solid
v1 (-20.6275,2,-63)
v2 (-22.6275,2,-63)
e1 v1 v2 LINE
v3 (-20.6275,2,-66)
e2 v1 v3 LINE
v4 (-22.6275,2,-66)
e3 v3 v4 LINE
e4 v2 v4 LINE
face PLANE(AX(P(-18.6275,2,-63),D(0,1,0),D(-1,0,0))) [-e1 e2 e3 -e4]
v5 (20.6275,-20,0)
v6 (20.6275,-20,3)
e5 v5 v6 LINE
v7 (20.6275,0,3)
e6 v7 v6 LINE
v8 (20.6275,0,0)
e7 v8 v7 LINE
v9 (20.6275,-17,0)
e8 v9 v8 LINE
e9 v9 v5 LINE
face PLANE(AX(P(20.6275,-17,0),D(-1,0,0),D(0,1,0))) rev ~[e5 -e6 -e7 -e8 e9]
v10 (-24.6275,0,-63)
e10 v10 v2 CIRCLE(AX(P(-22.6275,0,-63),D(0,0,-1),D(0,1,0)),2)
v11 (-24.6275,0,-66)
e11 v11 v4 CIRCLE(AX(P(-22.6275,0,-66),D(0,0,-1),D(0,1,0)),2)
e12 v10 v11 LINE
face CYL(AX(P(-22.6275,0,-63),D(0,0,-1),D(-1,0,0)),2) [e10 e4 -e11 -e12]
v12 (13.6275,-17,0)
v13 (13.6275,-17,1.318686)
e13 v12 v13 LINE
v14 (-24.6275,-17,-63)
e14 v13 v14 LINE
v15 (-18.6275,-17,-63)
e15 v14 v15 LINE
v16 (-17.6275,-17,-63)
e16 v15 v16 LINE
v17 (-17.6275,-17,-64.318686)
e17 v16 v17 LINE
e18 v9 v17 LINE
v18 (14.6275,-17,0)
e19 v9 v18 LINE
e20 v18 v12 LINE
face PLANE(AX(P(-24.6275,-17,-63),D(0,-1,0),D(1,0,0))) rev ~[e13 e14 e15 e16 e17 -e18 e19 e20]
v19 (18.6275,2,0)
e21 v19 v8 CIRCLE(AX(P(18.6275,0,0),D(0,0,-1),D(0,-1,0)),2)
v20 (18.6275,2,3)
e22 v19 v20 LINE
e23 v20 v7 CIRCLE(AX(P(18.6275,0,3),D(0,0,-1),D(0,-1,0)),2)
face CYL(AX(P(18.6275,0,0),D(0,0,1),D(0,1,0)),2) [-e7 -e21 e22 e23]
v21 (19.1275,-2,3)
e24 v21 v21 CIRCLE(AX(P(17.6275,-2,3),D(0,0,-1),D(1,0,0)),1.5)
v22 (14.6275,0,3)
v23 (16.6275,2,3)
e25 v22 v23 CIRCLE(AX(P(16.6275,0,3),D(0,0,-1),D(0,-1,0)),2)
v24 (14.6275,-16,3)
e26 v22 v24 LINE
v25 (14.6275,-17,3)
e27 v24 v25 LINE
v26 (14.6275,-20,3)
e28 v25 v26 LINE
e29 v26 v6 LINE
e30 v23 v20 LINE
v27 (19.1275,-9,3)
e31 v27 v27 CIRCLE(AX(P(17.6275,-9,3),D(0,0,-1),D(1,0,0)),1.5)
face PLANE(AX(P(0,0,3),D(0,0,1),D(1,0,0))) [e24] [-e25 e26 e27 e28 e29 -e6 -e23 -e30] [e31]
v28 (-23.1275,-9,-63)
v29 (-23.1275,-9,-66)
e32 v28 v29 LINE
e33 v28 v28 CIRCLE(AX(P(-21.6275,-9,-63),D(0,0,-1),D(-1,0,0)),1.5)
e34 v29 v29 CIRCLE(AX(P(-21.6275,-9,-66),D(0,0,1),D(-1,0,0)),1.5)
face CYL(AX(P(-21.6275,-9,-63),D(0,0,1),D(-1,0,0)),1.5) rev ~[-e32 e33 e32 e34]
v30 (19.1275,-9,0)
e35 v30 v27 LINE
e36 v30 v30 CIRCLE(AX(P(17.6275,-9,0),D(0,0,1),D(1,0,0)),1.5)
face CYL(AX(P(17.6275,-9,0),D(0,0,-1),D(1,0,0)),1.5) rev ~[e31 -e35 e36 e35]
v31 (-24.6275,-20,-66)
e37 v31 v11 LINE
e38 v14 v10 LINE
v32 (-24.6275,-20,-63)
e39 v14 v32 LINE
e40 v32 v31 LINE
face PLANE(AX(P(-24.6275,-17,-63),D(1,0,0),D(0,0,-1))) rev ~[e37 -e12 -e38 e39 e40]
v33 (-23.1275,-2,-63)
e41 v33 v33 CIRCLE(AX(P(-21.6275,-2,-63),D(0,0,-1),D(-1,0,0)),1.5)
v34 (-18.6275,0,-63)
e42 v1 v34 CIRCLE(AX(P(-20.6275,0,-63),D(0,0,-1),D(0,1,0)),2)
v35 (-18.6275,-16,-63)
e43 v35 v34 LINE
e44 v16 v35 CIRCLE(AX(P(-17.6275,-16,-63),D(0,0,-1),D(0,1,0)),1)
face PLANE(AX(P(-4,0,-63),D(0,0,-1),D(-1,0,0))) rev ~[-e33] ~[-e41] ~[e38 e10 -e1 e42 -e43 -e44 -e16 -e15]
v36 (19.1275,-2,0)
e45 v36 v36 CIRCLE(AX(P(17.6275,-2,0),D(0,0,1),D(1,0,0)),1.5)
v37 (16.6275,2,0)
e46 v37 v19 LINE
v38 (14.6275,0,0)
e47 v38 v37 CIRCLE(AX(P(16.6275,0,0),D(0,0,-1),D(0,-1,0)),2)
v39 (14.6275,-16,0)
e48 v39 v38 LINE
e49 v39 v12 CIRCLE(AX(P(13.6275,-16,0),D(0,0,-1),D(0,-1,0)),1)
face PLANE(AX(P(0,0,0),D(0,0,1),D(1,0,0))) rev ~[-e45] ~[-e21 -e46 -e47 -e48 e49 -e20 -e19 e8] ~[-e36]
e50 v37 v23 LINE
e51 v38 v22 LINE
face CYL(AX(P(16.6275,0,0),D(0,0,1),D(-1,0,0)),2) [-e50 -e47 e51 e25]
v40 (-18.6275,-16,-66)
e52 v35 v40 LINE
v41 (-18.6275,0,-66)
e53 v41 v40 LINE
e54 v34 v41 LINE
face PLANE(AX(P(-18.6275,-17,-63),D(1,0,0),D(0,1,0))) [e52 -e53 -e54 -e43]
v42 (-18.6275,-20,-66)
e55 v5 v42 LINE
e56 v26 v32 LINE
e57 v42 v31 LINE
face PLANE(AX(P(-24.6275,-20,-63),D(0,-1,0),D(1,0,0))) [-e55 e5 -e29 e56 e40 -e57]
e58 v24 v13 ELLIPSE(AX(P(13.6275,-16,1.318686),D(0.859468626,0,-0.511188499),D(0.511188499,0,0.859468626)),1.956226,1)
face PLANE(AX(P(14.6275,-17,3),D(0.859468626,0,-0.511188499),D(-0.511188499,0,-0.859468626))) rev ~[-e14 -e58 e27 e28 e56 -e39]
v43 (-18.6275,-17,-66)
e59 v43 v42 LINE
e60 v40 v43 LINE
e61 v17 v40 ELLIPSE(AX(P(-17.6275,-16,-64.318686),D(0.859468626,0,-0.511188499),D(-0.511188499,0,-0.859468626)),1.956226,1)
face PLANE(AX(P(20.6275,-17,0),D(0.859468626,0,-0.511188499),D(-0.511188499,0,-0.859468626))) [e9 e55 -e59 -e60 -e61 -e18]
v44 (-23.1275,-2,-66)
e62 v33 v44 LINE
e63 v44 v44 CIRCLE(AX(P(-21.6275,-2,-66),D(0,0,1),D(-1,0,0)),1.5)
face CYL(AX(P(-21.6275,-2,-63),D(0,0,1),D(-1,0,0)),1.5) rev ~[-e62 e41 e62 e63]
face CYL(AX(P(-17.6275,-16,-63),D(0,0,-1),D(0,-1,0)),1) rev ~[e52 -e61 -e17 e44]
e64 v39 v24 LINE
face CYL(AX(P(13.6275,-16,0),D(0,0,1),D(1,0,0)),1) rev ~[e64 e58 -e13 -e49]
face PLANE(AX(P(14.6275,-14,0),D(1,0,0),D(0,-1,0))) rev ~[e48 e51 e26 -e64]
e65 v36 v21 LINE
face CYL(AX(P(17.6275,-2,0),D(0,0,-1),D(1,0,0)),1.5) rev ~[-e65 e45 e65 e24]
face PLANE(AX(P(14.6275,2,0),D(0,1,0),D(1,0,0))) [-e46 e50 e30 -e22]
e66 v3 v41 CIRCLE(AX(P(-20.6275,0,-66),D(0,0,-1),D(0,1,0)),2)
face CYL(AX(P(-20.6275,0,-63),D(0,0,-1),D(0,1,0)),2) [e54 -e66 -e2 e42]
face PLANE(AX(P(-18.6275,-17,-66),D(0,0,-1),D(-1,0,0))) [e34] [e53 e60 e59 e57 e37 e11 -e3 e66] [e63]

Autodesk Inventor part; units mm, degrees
ref_plane "YZ Plane" through (0, 0, 0) normal (1, 0, 0) x (0, 1, 0)
ref_plane "XZ Plane" through (0, 0, 0) normal (0, 1, 0) x (-1, 0, 0)
ref_plane "XY Plane" through (0, 0, 0) normal (0, 0, 1) x (1, 0, 0)
sketch "Sketch1" plane through (0, 0, 0) normal (0, 0, 1) x (1, 0, 0)
  line L0 (32.6242, -2.1) -> (40.6242, -2.1) projected
  arc A0 (41.6242, -3.1) -> (40.6242, -2.1) centre (40.6242, -3.1) ccw projected
  line L1 (41.6242, -3.1) -> (41.6242, -14) projected
  line L2 (65.6275, -14) -> (41.6242, -14) projected
  line L3 (65.6275, -14) -> (65.6275, -2) projected
  arc A1 (67.6275, 0) -> (65.6275, -2) centre (67.6275, -2) ccw projected
  line L4 (67.6275, 0) -> (74, 0) projected
  line L5 (74, 0) -> (74, 2) projected
  line L6 (10, 2) -> (74, 2) projected
  line L7 (10, 2) -> (10, -14) projected
  line L8 (31.6242, -14) -> (10, -14) projected
  line L9 (31.6242, -14) -> (31.6242, -3.1) projected
  arc A2 (32.6242, -2.1) -> (31.6242, -3.1) centre (32.6242, -3.1) ccw projected
  circle A3 centre (12.5, -10.5) radius 1 projected
  circle A4 centre (59.6275, -9) radius 1.5 projected
  circle A5 centre (27.6275, -9) radius 1.5 projected
  circle A6 centre (17.6275, -2) radius 1.5 projected
  circle A7 centre (47.6275, -2) radius 1.5 projected
  circle A8 centre (59.6275, -2) radius 1.5 projected
  circle A9 centre (27.6275, -2) radius 1.5 projected
  circle A10 centre (17.6275, -9) radius 1.5 projected
  circle A11 centre (47.6275, -9) radius 1.5 projected
  line L10 (17.6275, -9) -> (17.6275, -2)
  line L11 (64.6275, -17) -> (10, -17) projected
  line L12 (20.6275, -13) -> (14.6275, -13)
  line L13 (14.6275, -13) -> (14.6275, 2)
  line L14 (14.6275, 2) -> (20.6275, 2)
  line L15 (20.6275, 2) -> (20.6275, -13)
  line L16 (20.6275, -13) -> (14.6275, 2) construction
  line L17 (14.6275, -13) -> (20.6275, 2) construction
  line L18 (20.6275, -13) -> (14.6275, -13)
  line L19 (14.6275, -13) -> (14.6275, -17)
  line L20 (14.6275, -17) -> (20.6275, -17)
  line L21 (20.6275, -17) -> (20.6275, -13)
  point P0 (0, 0)
  point P1 (17.6275, -5.5)
  dimension "d0" = 6
  dimension "d1" = 15
  dimension "d2" = 6
  dimension "d3" = 4
extrude "Extrusion1" add sketch "Sketch1" along normal blind 3 contours L21 L11 L19 L8 | L8 L19 L12 L21 | L12 L13 L6 L15
ref_plane "Work Plane1" through (-4, 0, -63) normal (0, 0, -1) x (-1, 0, 0)
sketch "Sketch2" plane through (-4, 0, -63) normal (0, 0, -1) x (-1, 0, 0)
  line L0 (32.6242, -2.1) -> (40.6242, -2.1) projected
  arc A0 (41.6242, -3.1) -> (40.6242, -2.1) centre (40.6242, -3.1) ccw projected
  line L1 (41.6242, -3.1) -> (41.6242, -14) projected
  line L2 (65.6275, -14) -> (41.6242, -14) projected
  line L3 (65.6275, -14) -> (65.6275, -2) projected
  arc A1 (67.6275, 0) -> (65.6275, -2) centre (67.6275, -2) ccw projected
  line L4 (67.6275, 0) -> (74, 0) projected
  line L5 (74, 0) -> (74, 2) projected
  line L6 (10, 2) -> (74, 2) projected
  line L7 (10, 2) -> (10, -14) projected
  line L8 (31.6242, -14) -> (10, -14) projected
  line L9 (31.6242, -14) -> (31.6242, -3.1) projected
  arc A2 (32.6242, -2.1) -> (31.6242, -3.1) centre (32.6242, -3.1) ccw projected
  circle A3 centre (12.5, -10.5) radius 1 projected
  circle A4 centre (59.6275, -9) radius 1.5 projected
  circle A5 centre (27.6275, -9) radius 1.5 projected
  circle A6 centre (17.6275, -2) radius 1.5 projected
  circle A7 centre (47.6275, -2) radius 1.5 projected
  circle A8 centre (59.6275, -2) radius 1.5 projected
  circle A9 centre (27.6275, -2) radius 1.5 projected
  circle A10 centre (17.6275, -9) radius 1.5 projected
  circle A11 centre (47.6275, -9) radius 1.5 projected
  line L10 (64.6275, -17) -> (10, -17) projected
  line L11 (17.6275, -9) -> (17.6275, -2)
  line L12 (14.6275, -13) -> (20.6275, -13)
  line L13 (20.6275, -13) -> (20.6275, 2)
  line L14 (20.6275, 2) -> (14.6275, 2)
  line L15 (14.6275, 2) -> (14.6275, -13)
  line L16 (14.6275, -13) -> (20.6275, 2) construction
  line L17 (20.6275, -13) -> (14.6275, 2) construction
  line L18 (14.6275, -13) -> (20.6275, -13)
  line L19 (20.6275, -13) -> (20.6275, -17)
  line L20 (20.6275, -17) -> (14.6275, -17)
  line L21 (14.6275, -17) -> (14.6275, -13)
  point P0 (-4, 0)
  point P1 (17.6275, -5.5)
  dimension "d6" = 6
  dimension "d7" = 15
  dimension "d8" = 6
  dimension "d9" = 4
extrude "Extrusion2" add sketch "Sketch2" along normal blind 3 contours L19 L10 L21 L8 | L8 L21 L12 L19 | L12 L15 L6 L13
sketch "Sketch3" plane through (-24.6275, -17, -63) normal (0, -1, 0) x (1, 0, 0)
  line L0 (6, 0) -> (0, 0) projected
  line L1 (0, 0) -> (0, -3) projected
  line L2 (6, -3) -> (0, -3) projected
  line L3 (6, 0) -> (6, -3) projected
  line L4 (39.255, 63) -> (45.255, 63) projected
  line L5 (45.255, 63) -> (45.255, 66) projected
  line L6 (39.255, 66) -> (45.255, 66) projected
  line L7 (39.255, 63) -> (39.255, 66) projected
  line L8 (45.255, 63) -> (6, -3)
  line L9 (39.255, 63) -> (39.255, 66) projected
  line L10 (39.255, 66) -> (0, 0)
  point P0 (24.6275, 63)
extrude "Extrusion3" add sketch "Sketch3" along normal blind 3
fillet "Fillet1" radius 1 2 edges at (14.6275, -17, 1.5) (-18.6275, -17, -64.5)
fillet "Fillet2" radius 2 4 edges at (-18.6275, 2, -64.5) (-24.6275, 2, -64.5) (20.6275, 2, 1.5) (14.6275, 2, 1.5)
properties part number "pcb_holder_3"
